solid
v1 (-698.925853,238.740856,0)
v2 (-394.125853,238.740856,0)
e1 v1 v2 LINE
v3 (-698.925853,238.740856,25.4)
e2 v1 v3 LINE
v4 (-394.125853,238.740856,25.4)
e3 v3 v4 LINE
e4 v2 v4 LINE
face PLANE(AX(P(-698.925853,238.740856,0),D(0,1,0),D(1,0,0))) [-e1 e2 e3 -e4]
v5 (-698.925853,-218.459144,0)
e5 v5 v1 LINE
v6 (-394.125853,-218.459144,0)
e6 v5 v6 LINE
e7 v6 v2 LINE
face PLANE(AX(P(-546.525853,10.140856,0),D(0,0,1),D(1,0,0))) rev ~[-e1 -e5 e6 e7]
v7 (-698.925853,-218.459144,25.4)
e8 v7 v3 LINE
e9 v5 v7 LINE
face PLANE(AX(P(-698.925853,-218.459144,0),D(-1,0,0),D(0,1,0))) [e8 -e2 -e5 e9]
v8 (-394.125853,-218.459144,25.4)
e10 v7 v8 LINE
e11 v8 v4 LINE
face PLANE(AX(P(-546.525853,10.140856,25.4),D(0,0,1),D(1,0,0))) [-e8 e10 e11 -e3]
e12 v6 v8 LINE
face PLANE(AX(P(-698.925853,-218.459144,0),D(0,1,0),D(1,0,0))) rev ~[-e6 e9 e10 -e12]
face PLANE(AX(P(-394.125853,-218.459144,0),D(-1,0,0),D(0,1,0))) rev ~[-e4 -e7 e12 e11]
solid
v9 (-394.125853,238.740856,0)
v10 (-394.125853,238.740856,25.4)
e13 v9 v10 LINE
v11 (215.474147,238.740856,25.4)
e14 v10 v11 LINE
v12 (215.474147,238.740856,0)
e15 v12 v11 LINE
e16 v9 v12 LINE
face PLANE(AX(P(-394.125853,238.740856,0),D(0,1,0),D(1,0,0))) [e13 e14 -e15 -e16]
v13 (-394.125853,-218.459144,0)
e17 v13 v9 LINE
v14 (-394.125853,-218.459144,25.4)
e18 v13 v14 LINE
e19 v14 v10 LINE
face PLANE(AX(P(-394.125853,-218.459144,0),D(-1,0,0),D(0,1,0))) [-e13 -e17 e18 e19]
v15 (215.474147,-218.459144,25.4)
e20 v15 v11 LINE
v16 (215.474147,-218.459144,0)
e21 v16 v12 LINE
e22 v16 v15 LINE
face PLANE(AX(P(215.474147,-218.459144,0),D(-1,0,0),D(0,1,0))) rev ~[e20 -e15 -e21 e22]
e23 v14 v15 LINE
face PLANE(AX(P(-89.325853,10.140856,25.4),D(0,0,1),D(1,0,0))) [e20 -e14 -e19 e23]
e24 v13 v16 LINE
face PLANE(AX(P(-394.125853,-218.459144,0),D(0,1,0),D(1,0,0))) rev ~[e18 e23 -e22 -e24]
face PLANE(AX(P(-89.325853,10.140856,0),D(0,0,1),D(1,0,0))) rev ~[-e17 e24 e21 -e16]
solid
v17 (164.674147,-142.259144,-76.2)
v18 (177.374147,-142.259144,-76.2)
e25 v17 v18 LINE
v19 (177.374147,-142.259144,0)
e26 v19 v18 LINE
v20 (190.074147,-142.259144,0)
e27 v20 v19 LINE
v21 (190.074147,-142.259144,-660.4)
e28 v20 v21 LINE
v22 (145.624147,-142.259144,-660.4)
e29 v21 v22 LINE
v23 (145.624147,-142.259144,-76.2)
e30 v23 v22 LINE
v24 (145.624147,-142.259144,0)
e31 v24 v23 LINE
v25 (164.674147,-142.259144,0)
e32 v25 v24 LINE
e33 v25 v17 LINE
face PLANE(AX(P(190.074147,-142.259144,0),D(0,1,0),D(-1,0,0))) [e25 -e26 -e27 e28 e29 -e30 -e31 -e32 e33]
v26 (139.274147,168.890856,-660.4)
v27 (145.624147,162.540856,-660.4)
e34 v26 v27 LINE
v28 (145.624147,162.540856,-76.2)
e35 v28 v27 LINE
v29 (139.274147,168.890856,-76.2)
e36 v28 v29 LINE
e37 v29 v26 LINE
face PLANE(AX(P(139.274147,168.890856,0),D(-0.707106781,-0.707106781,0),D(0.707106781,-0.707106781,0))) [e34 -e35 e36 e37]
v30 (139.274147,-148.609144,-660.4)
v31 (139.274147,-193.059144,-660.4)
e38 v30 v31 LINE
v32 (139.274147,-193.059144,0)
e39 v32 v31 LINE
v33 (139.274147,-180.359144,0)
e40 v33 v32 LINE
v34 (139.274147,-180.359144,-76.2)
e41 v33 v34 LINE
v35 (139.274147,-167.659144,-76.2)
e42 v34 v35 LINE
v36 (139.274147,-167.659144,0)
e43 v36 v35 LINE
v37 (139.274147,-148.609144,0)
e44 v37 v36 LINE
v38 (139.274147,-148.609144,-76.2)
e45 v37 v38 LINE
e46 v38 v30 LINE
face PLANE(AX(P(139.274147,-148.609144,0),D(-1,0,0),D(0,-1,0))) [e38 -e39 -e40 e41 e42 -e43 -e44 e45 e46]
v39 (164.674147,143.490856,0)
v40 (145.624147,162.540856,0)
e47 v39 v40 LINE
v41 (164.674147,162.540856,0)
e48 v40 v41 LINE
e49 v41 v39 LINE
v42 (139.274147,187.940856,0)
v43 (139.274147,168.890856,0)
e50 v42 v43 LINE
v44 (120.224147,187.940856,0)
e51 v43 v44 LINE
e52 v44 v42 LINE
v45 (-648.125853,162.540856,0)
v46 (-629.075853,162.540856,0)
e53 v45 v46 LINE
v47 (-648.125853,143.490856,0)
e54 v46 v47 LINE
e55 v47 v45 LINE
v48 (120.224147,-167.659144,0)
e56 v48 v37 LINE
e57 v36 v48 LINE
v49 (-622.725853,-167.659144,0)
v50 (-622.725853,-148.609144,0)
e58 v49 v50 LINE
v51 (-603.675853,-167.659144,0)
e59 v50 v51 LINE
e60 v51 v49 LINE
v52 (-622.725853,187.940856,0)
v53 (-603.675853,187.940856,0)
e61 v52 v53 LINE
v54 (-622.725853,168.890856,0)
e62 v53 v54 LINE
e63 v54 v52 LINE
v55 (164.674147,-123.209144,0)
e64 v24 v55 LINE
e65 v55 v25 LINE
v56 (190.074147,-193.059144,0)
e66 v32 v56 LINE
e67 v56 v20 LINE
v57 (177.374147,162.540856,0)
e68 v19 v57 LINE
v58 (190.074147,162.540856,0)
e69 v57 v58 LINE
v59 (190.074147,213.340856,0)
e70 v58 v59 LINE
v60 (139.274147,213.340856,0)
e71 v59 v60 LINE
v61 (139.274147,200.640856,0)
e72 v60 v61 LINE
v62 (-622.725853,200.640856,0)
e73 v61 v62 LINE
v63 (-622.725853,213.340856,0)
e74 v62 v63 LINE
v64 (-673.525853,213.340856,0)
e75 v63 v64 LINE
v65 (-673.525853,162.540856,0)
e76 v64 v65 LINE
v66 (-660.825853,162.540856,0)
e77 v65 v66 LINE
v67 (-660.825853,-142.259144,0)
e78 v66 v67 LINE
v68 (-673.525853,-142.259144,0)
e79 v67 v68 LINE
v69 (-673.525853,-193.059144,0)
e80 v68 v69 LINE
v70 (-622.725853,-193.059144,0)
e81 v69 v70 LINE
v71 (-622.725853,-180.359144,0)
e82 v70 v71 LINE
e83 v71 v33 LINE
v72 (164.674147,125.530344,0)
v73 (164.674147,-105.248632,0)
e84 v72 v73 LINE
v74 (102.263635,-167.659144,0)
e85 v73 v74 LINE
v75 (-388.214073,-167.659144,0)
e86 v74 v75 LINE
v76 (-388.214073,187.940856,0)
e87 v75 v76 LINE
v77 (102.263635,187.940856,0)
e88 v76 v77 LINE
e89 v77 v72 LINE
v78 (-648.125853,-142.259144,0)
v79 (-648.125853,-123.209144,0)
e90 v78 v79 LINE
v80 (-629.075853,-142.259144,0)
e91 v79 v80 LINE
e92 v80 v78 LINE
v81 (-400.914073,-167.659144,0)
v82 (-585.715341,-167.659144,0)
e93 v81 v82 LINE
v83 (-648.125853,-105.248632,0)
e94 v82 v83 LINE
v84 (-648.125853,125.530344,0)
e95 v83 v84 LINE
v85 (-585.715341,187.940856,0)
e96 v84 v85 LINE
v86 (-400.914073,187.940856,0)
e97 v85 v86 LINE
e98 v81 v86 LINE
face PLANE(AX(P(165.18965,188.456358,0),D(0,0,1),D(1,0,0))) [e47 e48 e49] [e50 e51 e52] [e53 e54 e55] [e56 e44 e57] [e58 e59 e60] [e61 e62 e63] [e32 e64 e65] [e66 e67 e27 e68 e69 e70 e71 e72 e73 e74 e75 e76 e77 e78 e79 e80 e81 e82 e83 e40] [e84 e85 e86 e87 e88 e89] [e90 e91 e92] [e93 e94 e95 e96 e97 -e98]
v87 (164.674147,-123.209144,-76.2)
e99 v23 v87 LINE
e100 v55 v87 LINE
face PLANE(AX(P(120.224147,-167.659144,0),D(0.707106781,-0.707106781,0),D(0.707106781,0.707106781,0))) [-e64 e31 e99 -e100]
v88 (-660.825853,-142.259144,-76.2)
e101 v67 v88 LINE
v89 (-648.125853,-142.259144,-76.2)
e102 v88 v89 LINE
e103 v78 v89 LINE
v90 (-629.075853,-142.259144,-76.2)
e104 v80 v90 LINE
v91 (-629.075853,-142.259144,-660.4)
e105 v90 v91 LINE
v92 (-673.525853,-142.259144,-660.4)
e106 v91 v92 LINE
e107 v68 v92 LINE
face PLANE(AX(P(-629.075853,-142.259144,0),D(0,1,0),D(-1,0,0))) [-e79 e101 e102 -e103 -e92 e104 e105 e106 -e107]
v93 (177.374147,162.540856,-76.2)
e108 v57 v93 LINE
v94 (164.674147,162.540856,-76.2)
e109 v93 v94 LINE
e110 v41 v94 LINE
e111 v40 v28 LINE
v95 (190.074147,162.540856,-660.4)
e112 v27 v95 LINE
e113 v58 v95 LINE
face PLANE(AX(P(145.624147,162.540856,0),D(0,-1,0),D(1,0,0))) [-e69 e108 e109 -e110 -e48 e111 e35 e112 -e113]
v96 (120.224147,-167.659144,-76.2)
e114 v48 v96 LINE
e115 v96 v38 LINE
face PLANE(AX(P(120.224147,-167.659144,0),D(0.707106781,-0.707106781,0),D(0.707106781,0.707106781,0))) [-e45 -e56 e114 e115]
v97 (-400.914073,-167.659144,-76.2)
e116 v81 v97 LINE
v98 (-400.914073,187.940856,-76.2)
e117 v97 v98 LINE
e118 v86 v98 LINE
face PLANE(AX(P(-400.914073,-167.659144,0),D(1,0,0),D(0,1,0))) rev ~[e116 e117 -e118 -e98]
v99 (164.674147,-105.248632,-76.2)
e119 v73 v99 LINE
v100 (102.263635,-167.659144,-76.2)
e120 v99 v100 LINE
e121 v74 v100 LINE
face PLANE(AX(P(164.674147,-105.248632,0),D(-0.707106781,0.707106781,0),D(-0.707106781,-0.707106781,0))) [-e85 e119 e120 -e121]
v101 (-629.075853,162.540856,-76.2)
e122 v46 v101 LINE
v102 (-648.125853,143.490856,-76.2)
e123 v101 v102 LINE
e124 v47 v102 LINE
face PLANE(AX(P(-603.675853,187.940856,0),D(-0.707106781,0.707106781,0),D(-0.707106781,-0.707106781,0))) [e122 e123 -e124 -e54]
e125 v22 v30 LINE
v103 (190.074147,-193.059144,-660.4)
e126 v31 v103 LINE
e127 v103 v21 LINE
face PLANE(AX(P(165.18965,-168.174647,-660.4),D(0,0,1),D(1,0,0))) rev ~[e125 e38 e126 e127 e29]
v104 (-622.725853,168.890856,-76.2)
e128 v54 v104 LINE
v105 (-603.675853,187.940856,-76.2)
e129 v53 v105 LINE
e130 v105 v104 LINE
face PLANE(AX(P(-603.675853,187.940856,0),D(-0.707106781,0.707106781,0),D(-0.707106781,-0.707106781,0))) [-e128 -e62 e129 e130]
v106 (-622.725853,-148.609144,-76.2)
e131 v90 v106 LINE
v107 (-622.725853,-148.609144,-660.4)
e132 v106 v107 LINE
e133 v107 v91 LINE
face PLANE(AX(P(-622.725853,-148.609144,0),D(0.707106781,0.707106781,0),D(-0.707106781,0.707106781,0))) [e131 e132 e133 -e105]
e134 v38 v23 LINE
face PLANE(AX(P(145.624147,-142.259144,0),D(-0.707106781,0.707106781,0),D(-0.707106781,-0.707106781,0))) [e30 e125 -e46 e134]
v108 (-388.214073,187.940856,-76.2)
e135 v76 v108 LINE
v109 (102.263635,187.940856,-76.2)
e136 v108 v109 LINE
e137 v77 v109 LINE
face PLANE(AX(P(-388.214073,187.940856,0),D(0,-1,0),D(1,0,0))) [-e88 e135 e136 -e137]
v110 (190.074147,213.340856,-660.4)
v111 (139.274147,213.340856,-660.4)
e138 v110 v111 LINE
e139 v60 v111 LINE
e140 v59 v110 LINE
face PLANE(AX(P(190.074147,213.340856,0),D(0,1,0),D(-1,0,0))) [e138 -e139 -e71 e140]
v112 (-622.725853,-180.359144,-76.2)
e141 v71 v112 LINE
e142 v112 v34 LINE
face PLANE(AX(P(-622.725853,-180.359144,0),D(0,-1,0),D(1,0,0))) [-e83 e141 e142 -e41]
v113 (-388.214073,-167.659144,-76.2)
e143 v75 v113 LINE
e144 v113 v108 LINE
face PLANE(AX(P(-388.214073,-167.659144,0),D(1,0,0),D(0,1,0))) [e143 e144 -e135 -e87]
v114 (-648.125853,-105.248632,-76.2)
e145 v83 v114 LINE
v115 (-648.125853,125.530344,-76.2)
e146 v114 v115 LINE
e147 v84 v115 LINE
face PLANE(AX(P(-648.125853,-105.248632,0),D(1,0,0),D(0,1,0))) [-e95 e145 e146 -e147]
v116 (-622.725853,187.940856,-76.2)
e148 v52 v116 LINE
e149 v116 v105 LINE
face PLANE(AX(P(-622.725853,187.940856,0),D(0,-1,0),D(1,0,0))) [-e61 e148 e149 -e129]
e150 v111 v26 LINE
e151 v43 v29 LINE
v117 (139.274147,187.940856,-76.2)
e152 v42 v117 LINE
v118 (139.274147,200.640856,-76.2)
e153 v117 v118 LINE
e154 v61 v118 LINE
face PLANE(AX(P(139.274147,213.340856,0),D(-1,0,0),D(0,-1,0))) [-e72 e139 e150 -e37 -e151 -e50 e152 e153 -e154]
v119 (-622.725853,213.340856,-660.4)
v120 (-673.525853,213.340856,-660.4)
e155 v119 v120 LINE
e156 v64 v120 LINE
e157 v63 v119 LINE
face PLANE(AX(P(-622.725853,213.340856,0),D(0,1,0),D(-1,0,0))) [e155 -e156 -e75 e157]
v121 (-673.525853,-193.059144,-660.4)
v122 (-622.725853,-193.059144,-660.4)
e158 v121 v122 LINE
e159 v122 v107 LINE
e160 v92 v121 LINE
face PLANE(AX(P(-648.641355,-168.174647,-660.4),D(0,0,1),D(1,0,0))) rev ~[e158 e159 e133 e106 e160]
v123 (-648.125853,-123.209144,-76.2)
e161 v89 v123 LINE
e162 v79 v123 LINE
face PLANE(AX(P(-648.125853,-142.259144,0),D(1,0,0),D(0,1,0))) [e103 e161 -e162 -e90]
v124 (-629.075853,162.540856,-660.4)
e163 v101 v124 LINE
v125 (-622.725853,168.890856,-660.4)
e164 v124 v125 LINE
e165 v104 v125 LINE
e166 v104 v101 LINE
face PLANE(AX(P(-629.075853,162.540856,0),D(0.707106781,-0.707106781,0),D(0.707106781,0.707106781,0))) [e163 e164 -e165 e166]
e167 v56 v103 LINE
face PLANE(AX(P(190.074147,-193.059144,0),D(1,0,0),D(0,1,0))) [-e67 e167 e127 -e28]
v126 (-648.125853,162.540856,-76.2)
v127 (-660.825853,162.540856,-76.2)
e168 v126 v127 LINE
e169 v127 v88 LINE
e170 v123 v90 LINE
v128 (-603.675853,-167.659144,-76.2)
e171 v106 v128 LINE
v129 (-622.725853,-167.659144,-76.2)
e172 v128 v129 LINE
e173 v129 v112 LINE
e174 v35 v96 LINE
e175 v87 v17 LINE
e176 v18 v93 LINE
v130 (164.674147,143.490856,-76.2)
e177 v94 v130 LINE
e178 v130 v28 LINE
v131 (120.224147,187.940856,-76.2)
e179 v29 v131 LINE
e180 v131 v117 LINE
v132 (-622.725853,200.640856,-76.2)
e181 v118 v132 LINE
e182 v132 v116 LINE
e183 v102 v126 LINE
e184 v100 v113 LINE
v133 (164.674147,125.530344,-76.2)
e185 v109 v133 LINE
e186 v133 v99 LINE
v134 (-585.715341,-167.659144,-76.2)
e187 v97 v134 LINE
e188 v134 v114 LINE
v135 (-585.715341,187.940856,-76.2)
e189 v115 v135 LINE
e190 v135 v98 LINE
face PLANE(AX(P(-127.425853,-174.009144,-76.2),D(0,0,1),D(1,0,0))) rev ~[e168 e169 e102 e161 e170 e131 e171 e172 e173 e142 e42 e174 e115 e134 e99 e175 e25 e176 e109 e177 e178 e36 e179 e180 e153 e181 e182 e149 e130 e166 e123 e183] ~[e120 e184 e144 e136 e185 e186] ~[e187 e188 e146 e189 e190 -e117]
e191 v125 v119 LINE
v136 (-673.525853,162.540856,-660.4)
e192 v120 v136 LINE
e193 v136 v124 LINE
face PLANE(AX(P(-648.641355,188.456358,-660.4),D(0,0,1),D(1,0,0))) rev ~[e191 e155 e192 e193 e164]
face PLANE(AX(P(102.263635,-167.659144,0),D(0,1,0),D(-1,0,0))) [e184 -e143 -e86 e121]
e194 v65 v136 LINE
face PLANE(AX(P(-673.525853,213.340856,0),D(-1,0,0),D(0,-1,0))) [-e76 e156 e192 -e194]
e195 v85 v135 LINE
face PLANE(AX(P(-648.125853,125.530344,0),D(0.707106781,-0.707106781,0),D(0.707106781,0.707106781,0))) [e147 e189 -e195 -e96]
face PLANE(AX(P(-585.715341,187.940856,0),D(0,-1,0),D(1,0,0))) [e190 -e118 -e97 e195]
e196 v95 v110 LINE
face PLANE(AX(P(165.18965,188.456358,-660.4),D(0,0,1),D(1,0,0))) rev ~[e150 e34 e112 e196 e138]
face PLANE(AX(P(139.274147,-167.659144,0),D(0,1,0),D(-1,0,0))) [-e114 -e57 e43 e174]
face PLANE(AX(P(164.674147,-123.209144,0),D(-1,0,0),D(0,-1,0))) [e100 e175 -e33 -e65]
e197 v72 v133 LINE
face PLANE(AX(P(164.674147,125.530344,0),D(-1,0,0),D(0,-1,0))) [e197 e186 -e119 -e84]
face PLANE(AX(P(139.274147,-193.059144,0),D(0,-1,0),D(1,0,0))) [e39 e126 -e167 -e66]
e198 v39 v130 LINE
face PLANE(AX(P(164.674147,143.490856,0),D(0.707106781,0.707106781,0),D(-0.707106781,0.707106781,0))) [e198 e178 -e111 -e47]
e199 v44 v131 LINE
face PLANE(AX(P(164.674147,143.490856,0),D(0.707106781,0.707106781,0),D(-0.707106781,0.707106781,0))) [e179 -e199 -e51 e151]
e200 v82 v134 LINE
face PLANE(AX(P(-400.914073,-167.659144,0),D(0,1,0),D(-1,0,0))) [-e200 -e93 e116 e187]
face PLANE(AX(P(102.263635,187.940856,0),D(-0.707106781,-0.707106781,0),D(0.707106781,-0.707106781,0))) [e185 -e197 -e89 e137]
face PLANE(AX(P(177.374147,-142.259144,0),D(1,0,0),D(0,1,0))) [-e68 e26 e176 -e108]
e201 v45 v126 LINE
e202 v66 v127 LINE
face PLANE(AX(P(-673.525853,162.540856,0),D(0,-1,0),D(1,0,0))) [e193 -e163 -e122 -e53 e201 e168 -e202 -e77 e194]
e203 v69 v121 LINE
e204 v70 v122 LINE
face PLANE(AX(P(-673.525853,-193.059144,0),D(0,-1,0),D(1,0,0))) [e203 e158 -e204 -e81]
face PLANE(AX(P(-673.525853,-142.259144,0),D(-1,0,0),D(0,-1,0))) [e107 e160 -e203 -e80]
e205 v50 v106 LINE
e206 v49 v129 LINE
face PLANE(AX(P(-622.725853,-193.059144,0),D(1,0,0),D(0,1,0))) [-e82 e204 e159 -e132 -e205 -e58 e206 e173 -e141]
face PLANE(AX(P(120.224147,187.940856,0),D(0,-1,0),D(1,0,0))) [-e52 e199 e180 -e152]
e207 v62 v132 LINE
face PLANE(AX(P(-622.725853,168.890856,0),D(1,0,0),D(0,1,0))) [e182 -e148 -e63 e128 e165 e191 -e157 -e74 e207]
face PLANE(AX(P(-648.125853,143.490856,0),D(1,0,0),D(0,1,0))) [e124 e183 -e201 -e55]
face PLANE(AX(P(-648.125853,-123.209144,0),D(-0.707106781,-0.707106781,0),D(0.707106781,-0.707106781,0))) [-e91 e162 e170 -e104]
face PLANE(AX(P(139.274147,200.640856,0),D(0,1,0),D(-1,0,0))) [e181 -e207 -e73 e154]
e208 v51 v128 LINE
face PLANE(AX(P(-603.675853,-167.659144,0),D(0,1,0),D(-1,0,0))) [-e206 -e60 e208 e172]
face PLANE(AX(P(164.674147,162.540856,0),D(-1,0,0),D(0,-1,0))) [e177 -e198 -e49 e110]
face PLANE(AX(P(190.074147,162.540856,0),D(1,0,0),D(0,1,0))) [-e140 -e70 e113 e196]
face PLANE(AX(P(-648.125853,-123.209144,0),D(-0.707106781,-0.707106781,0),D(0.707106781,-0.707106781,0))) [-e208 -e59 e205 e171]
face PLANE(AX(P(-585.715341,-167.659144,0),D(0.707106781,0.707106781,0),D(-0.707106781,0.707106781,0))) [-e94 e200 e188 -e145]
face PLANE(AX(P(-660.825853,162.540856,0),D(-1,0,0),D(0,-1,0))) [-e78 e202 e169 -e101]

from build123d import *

# Parameters (mm, degrees)
F0_W     = 609.6
F0_H     = 457.2
F1_DEPTH = 25.4
F0_W_2   = 304.8
F2_DEPTH = 25.4
F3_W     = 6.7882202148
F3_H     = 355.6
F3_W_2   = 5.9117797852
F4_DEPTH = 76.2
F5_DEPTH = 660.4


with BuildPart() as f1:
    # F0 (on Top) → F1 (new body)
    with BuildSketch(Plane.XY):
        with Locations((-89.3258527756, 10.1408557653)):
            Rectangle(F0_W, F0_H)
    extrude(amount=F1_DEPTH)


with BuildPart() as f2:
    # F0 (on Top) → F2 (new body)
    with BuildSketch(Plane.XY):
        with Locations((-546.5258527756, 10.1408557653)):
            Rectangle(F0_W_2, F0_H)
    extrude(amount=F2_DEPTH)


with BuildPart() as f4:
    # F3 (on face) → F4 (new body)
    with BuildSketch(Plane.XY):
        Polygon((-394.1258527756, -167.6591442347), (-394.1258527756, -180.3591442347), (139.2741472244, -180.3591442347), (139.2741472244, -167.6591442347), (120.2241472244, -167.6591442347), (102.2636349823, -167.6591442347), (-241.7258527756, -167.6591442347), (-388.2140729904, -167.6591442347), align=None)
        Polygon((-622.7258527756, -167.6591442347), (-622.7258527756, -180.3591442347), (-394.1258527756, -180.3591442347), (-394.1258527756, -167.6591442347), (-400.9140729904, -167.6591442347), (-585.7153405334, -167.6591442347), (-603.6758527756, -167.6591442347), align=None)
        Polygon((-622.7258527756, -142.2591442347), (-622.7258527756, -148.6091442347), (-603.6758527756, -167.6591442347), (-585.7153405334, -167.6591442347), (-648.1258527756, -105.2486319925), (-648.1258527756, -123.2091442347), (-629.0758527756, -142.2591442347), align=None)
        Polygon((-660.8258527756, 162.5408557653), (-660.8258527756, -142.2591442347), (-648.1258527756, -142.2591442347), (-648.1258527756, -123.2091442347), (-648.1258527756, -105.2486319925), (-648.1258527756, 125.5303435232), (-648.1258527756, 143.4908557653), (-648.1258527756, 162.5408557653), align=None)
        Polygon((-622.7258527756, 162.5408557653), (-629.0758527756, 162.5408557653), (-648.1258527756, 143.4908557653), (-648.1258527756, 125.5303435232), (-585.7153405334, 187.9408557653), (-603.6758527756, 187.9408557653), (-622.7258527756, 168.8908557653), align=None)
        Polygon((-400.9140729904, 187.9408557653), (-394.1258527756, 187.9408557653), (-394.1258527756, 200.6408557653), (-622.7258527756, 200.6408557653), (-622.7258527756, 187.9408557653), (-603.6758527756, 187.9408557653), (-585.7153405334, 187.9408557653), align=None)
        Polygon((-394.1258527756, 200.6408557653), (-394.1258527756, 187.9408557653), (-388.2140729904, 187.9408557653), (102.2636349823, 187.9408557653), (120.2241472244, 187.9408557653), (139.2741472244, 187.9408557653), (139.2741472244, 200.6408557653), align=None)
        Polygon((120.2241472244, 187.9408557653), (102.2636349823, 187.9408557653), (164.6741472244, 125.5303435232), (164.6741472244, 143.4908557653), (145.6241472244, 162.5408557653), (139.2741472244, 162.5408557653), (139.2741472244, 168.8908557653), align=None)
        Polygon((164.6741472244, -142.2591442347), (177.3741472244, -142.2591442347), (177.3741472244, 162.5408557653), (164.6741472244, 162.5408557653), (164.6741472244, 143.4908557653), (164.6741472244, 125.5303435232), (164.6741472244, -105.2486319925), (164.6741472244, -123.2091442347), align=None)
        Polygon((-629.0758527756, -142.2591442347), (-622.7258527756, -148.6091442347), (-622.7258527756, -142.2591442347), align=None)
        Polygon((-622.7258527756, 168.8908557653), (-629.0758527756, 162.5408557653), (-622.7258527756, 162.5408557653), align=None)
        Polygon((145.6241472244, 162.5408557653), (139.2741472244, 168.8908557653), (139.2741472244, 162.5408557653), align=None)
        Polygon((139.2741472244, -142.2591442347), (139.2741472244, -148.6091442347), (145.6241472244, -142.2591442347), align=None)
        Polygon((120.2241472244, -167.6591442347), (139.2741472244, -148.6091442347), (139.2741472244, -142.2591442347), (145.6241472244, -142.2591442347), (164.6741472244, -123.2091442347), (164.6741472244, -105.2486319925), (102.2636349823, -167.6591442347), align=None)
        with Locations((-397.519962883, 10.1408557653)):
            Rectangle(F3_W, F3_H)
        with Locations((-391.169962883, 10.1408557653)):
            Rectangle(F3_W_2, F3_H)
    extrude(amount=-F4_DEPTH)

    # F3 (on face) → F5 (join)
    with BuildSketch(Plane.XY):
        Polygon((139.2741472244, 213.3408557653), (139.2741472244, 200.6408557653), (139.2741472244, 187.9408557653), (139.2741472244, 168.8908557653), (145.6241472244, 162.5408557653), (164.6741472244, 162.5408557653), (177.3741472244, 162.5408557653), (190.0741472244, 162.5408557653), (190.0741472244, 213.3408557653), align=None)
        Polygon((139.2741472244, -167.6591442347), (139.2741472244, -180.3591442347), (139.2741472244, -193.0591442347), (190.0741472244, -193.0591442347), (190.0741472244, -142.2591442347), (177.3741472244, -142.2591442347), (164.6741472244, -142.2591442347), (145.6241472244, -142.2591442347), (139.2741472244, -148.6091442347), align=None)
        Polygon((-673.5258527756, 162.5408557653), (-660.8258527756, 162.5408557653), (-648.1258527756, 162.5408557653), (-629.0758527756, 162.5408557653), (-622.7258527756, 168.8908557653), (-622.7258527756, 187.9408557653), (-622.7258527756, 200.6408557653), (-622.7258527756, 213.3408557653), (-673.5258527756, 213.3408557653), align=None)
        Polygon((-673.5258527756, -142.2591442347), (-673.5258527756, -193.0591442347), (-622.7258527756, -193.0591442347), (-622.7258527756, -180.3591442347), (-622.7258527756, -167.6591442347), (-622.7258527756, -148.6091442347), (-629.0758527756, -142.2591442347), (-648.1258527756, -142.2591442347), (-660.8258527756, -142.2591442347), align=None)
    extrude(amount=-F5_DEPTH)


solid = Compound([f1.part, f2.part, f4.part])
